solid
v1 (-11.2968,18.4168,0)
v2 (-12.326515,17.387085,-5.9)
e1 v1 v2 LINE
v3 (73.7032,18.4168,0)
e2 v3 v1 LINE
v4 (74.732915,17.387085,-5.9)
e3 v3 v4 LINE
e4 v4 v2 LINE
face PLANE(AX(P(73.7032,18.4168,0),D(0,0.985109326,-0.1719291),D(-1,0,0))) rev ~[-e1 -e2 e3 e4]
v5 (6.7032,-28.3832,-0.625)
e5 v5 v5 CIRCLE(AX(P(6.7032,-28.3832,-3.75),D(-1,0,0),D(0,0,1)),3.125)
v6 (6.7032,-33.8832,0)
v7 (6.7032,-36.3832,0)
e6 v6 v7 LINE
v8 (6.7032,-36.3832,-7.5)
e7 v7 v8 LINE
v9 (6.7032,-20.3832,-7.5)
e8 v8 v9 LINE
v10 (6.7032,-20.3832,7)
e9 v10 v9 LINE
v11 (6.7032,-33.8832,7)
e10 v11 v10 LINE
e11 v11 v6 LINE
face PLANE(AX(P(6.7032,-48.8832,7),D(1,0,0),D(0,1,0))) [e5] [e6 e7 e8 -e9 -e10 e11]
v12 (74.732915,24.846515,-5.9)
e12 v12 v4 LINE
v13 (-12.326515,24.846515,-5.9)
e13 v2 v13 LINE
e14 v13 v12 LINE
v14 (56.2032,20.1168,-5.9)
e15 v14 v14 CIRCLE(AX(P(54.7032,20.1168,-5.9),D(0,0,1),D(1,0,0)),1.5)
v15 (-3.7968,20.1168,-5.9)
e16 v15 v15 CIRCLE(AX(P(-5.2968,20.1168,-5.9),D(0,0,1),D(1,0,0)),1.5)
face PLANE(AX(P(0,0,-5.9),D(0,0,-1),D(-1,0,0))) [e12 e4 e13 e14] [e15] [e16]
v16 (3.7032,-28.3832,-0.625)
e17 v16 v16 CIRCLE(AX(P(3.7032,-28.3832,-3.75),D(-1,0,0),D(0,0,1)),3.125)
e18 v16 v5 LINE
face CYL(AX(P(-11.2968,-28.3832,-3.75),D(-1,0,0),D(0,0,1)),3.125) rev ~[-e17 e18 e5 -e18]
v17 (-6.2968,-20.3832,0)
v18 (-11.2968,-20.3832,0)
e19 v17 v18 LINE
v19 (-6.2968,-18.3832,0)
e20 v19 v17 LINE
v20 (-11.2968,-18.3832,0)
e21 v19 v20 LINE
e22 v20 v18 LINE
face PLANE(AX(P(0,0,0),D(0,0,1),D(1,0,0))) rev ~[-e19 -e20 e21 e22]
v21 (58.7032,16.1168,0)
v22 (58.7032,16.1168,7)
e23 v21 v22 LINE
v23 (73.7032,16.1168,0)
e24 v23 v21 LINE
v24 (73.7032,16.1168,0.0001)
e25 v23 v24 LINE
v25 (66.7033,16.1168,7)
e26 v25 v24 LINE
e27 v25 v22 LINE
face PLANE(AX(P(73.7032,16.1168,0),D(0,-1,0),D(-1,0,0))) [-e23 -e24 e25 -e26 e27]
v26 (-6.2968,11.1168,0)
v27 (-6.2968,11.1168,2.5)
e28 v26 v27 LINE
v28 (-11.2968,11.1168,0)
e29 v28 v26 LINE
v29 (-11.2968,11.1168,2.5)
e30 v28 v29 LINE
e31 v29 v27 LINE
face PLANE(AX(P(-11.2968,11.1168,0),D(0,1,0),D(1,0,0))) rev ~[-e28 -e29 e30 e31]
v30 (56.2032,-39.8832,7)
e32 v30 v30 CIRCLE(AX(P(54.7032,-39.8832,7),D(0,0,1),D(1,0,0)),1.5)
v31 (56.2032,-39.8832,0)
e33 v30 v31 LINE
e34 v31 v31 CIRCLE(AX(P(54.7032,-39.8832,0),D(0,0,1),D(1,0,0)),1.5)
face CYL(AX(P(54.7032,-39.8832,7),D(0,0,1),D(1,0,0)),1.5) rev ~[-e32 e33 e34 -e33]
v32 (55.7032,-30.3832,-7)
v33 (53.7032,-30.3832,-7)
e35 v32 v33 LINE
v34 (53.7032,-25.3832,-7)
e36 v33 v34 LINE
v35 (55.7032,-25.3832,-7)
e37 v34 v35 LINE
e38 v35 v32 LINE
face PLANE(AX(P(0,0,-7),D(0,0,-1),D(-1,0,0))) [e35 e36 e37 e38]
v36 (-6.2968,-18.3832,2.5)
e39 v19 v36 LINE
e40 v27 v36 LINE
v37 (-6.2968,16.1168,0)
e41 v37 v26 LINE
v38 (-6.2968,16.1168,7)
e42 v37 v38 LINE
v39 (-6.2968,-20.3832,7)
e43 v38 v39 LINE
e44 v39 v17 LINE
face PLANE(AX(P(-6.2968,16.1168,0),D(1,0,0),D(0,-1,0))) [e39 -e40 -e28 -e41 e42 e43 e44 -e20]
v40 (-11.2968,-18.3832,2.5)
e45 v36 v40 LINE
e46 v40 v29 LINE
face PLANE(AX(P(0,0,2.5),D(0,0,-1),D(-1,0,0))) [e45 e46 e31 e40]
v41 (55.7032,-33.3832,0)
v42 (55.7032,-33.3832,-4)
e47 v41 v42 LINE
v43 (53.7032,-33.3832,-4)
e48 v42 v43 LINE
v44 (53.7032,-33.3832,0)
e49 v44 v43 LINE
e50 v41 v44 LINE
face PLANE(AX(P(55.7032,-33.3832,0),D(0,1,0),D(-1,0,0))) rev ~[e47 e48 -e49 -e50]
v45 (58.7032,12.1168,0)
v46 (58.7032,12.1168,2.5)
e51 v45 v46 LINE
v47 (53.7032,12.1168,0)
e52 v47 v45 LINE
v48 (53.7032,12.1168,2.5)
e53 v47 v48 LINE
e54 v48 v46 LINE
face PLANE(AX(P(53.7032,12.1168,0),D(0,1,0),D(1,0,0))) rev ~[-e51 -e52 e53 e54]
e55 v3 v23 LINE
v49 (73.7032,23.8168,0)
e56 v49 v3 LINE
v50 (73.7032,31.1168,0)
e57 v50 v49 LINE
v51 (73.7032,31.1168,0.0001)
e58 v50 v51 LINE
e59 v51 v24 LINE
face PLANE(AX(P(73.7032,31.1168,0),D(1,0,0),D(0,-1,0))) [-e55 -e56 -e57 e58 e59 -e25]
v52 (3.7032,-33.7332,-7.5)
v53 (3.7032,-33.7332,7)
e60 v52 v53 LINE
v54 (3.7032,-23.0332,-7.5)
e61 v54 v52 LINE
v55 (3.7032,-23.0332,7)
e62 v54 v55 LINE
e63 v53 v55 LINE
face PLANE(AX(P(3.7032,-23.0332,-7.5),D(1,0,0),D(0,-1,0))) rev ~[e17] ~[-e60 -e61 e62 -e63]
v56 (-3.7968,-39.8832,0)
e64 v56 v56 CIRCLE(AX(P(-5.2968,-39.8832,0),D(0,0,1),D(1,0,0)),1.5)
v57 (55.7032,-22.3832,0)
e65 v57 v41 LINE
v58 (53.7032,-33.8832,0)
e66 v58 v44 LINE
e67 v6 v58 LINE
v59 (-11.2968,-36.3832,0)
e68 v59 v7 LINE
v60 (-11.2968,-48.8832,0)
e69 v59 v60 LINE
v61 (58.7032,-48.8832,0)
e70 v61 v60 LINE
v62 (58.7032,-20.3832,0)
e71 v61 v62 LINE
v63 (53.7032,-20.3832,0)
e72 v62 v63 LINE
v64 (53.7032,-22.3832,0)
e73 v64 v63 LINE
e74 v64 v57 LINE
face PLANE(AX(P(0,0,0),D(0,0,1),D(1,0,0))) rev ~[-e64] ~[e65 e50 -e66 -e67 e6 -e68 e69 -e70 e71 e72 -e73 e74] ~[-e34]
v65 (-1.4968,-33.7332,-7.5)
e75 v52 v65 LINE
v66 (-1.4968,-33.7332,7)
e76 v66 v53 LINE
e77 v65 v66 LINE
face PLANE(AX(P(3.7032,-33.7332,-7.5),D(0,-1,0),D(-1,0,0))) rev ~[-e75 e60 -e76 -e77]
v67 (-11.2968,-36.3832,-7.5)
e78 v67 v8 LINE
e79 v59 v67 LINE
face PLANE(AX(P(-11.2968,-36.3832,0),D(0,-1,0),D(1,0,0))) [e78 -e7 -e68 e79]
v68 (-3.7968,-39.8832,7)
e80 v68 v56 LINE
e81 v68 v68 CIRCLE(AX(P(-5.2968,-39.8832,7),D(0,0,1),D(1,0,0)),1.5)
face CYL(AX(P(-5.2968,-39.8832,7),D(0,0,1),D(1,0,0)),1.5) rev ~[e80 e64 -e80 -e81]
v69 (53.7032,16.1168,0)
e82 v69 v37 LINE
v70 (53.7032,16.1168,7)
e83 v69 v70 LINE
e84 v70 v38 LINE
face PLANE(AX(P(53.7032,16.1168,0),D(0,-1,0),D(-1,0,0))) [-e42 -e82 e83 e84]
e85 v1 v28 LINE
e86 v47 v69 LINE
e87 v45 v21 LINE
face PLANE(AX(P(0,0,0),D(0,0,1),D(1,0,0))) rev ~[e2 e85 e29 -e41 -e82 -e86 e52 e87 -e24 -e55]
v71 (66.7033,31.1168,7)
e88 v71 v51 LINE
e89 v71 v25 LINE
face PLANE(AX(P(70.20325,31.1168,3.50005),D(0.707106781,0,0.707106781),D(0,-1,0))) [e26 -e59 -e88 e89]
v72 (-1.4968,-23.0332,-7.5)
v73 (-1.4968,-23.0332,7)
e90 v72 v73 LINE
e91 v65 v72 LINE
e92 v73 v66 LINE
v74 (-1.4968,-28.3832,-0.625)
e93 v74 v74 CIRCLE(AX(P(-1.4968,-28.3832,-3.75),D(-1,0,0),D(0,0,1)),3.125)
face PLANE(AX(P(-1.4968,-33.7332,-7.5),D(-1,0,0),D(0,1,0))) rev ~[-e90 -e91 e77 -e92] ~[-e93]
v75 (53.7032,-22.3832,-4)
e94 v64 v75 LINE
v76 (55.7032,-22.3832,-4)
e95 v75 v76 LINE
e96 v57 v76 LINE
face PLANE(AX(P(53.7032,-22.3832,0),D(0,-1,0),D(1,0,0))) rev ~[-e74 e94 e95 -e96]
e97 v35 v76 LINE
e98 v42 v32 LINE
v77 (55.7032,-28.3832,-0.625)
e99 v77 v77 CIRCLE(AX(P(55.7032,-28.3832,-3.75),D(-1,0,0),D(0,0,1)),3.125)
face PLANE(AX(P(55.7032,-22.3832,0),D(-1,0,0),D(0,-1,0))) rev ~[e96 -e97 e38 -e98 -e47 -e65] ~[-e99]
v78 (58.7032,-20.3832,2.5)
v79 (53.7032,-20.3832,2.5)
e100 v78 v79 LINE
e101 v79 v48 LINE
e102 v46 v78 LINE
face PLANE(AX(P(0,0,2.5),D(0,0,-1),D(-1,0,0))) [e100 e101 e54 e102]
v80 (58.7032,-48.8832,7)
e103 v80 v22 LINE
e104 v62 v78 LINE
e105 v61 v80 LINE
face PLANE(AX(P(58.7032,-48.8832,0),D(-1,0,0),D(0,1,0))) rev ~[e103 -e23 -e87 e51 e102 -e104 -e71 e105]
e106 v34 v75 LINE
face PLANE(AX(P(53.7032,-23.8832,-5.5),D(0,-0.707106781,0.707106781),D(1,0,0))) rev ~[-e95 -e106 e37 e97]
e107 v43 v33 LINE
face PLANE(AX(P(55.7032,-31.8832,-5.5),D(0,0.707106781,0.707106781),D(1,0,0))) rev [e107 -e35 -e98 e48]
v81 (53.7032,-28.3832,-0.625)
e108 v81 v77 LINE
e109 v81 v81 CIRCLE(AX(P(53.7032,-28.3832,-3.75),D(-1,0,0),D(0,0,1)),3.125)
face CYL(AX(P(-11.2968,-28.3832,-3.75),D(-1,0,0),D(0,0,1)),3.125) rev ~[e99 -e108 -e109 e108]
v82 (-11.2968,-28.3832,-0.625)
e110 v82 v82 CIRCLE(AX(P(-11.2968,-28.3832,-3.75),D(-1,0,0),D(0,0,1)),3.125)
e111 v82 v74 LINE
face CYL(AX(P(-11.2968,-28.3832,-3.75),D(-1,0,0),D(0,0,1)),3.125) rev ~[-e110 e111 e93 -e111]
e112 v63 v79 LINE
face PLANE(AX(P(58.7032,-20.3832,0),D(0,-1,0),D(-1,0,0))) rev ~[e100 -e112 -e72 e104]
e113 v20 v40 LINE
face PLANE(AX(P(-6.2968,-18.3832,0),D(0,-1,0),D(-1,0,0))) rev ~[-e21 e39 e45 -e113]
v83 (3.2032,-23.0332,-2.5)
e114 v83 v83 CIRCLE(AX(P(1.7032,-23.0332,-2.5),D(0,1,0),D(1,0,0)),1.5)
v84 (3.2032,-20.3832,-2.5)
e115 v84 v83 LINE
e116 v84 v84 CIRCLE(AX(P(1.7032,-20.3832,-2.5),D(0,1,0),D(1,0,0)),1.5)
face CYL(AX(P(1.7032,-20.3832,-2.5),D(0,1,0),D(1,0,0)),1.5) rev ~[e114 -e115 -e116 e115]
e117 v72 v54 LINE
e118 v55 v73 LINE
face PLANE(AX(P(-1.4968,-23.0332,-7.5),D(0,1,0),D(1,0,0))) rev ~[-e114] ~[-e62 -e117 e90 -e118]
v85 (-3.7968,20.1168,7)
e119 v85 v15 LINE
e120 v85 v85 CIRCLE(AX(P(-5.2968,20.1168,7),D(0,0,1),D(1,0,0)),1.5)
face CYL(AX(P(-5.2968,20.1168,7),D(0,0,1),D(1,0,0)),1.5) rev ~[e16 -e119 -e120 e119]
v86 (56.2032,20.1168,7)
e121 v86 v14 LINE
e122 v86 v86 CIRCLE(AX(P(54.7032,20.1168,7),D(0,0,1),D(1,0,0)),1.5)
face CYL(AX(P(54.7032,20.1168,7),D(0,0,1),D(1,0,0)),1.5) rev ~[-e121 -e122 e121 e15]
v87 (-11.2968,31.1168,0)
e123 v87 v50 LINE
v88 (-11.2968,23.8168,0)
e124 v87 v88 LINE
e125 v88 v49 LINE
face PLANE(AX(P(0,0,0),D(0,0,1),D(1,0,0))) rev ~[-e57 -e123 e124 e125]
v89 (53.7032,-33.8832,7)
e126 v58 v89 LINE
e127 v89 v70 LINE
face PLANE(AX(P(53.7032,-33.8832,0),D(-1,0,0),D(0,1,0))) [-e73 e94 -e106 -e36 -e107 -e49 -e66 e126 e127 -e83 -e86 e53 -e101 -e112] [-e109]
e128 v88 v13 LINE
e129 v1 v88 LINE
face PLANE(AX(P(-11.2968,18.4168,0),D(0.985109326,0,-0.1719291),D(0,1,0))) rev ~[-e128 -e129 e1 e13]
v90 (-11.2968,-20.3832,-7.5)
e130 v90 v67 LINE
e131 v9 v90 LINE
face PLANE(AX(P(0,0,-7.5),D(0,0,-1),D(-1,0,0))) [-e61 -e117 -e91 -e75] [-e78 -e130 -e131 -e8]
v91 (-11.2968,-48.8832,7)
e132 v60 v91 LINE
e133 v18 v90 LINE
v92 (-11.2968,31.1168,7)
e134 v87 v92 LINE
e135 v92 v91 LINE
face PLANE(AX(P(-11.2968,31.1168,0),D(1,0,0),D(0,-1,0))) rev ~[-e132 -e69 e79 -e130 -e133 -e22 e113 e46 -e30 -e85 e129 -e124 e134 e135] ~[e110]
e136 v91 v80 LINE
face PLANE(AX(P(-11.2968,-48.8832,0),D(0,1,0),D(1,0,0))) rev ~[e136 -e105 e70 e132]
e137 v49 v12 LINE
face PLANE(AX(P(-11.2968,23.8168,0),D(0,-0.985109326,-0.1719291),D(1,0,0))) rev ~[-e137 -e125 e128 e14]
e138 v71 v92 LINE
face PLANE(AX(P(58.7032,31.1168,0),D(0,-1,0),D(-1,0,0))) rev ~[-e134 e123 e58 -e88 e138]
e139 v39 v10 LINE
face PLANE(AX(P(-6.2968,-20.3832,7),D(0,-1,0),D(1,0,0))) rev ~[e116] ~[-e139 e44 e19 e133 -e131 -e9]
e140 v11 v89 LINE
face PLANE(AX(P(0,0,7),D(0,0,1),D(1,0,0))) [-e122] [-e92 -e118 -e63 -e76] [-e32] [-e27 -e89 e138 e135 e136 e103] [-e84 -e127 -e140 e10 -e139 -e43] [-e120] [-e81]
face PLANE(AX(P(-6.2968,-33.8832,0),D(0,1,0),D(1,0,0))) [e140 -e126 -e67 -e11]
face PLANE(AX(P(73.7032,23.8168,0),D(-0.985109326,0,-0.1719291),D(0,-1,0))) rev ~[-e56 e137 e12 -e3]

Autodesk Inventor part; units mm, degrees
ref_plane "YZ Plane" through (0, 0, 0) normal (1, 0, 0) x (0, 1, 0)
ref_plane "XZ Plane" through (0, 0, 0) normal (0, 1, 0) x (-1, 0, 0)
sketch "Sketch1" plane through (0, 0, 0) normal (0, 0, 1) x (1, 0, 0)
  line L0 (58.7032, 31.1168) -> (-11.2968, 31.1168)
  line L1 (-11.2968, 31.1168) -> (-11.2968, -48.8832)
  line L2 (-11.2968, -48.8832) -> (58.7032, -48.8832)
  line L3 (58.7032, -48.8832) -> (58.7032, 31.1168)
  line L4 (53.7032, 16.1168) -> (-6.2968, 16.1168)
  line L5 (-6.2968, 16.1168) -> (-6.2968, -33.8832)
  line L6 (-6.2968, -33.8832) -> (53.7032, -33.8832)
  line L7 (53.7032, -33.8832) -> (53.7032, 16.1168)
  line L8 (58.7032, 31.1168) -> (73.7032, 31.1168)
  line L9 (73.7032, 31.1168) -> (73.7032, 16.1168)
  line L10 (73.7032, 16.1168) -> (58.7032, 16.1168)
  line L11 (58.7032, 16.1168) -> (58.7032, 31.1168)
  point P0 (0, 0)
  dimension "d0" = 70
  dimension "d1" = 80
  dimension "d4" = 60
  dimension "d5" = 50
  dimension "d6" = 15
  dimension "d7" = 5
  dimension "d76" = 15
  dimension "d77" = 15
extrude "Extrusion1" add sketch "Sketch1" along normal blind 7
sketch "Sketch2" plane through (0, 0, 0) normal (0, 0, -1) x (-1, 0, 0)
  line L0 (11.2968, 23.8168) -> (-73.7032, 23.8168)
  line L1 (-73.7032, 23.8168) -> (-73.7032, 18.4168)
  line L2 (-73.7032, 18.4168) -> (11.2968, 18.4168)
  line L3 (11.2968, 18.4168) -> (11.2968, 23.8168)
  line L4 (11.2968, 31.1168) -> (11.2968, -48.8832) projected
  line L5 (-58.7032, -48.8832) -> (-58.7032, 16.1168) projected
  line L6 (-73.7032, 16.1168) -> (-73.7032, 31.1168) projected
  line L7 (-73.7032, 31.1168) -> (11.2968, 31.1168) projected
  point P0 (0, 0)
  dimension "d9" = 5.4
  dimension "d10" = 0
  dimension "d78" = 0
  dimension "d79" = 7.3
extrude "Extrusion2" add sketch "Sketch2" along normal blind 5.9 draft 9.9 contours L3 L2 L1 L0
ref_plane "Work Plane1" through (-126.6696, -48.8832, -9) normal (0, 0, 1) x (1, 0, 0)
sketch "Sketch3" plane through (0, 0, 0) normal (0, 0, -1) x (-1, 0, 0)
  line L0 (11.2968, -36.3832) -> (-6.7032, -36.3832)
  line L1 (-6.7032, -36.3832) -> (-6.7032, -20.3832)
  line L2 (-6.7032, -20.3832) -> (11.2968, -20.3832)
  line L3 (11.2968, -20.3832) -> (11.2968, -36.3832)
  line L4 (11.2968, -48.8832) -> (-58.7032, -48.8832) projected
  line L5 (11.2968, 18.4168) -> (11.2968, -48.8832) projected
  line L6 (-55.7032, -33.3832) -> (-53.7032, -33.3832)
  line L7 (-53.7032, -33.3832) -> (-53.7032, -22.3832)
  line L8 (-53.7032, -22.3832) -> (-55.7032, -22.3832)
  line L9 (-55.7032, -22.3832) -> (-55.7032, -33.3832)
  line L10 (-53.7032, -33.8832) -> (6.2968, -33.8832) projected
  line L11 (-53.7032, 16.1168) -> (-53.7032, -33.8832) projected
  point P0 (0, 0)
  point P1 (-54.7032, -33.3832)
  dimension "d14" = 16
  dimension "d15" = 18
  dimension "d16" = 12.5
  dimension "d17" = 0
  dimension "d62" = 11
  dimension "d63" = 0
  dimension "d64" = 2
  dimension "d102" = 0.5
extrude "Extrusion3" add sketch "Sketch3" along normal blind 7.5
sketch "Sketch6" plane through (0, 0, 7) normal (0, 0, 1) x (1, 0, 0)
  line L0 (-6.2968, -20.3832) -> (6.7032, -20.3832) projected
  line L1 (-11.2968, -48.8832) -> (58.7032, -48.8832) projected
  line L2 (6.7032, -20.3832) -> (-11.2968, -20.3832)
  line L3 (-11.2968, -20.3832) -> (-11.2968, -48.8832)
  line L4 (-11.2968, -48.8832) -> (6.7032, -48.8832)
  line L5 (6.7032, -48.8832) -> (6.7032, -20.3832)
  point P0 (0, 0)
  point P1 (6.7032, -48.8832)
  point P2 (-6.2968, -20.3832)
extrude "Extrusion6" add sketch "Sketch6" against normal up to surface (7 mm away)
sketch "Sketch9" plane through (-11.2968, -48.8832, 7) normal (-1, 0, 0) x (0, 0, 1)
  circle A0 centre (-10.75, 20.5) radius 3.125
  line L0 (0, 80) -> (0, 0) projected
  line L1 (-7, 0) -> (0, 0) projected
  line L2 (-7, 28.5) -> (-7, 65) projected
  point P0 (-7, 48.8832)
  point P1 (-4, 28.5)
  point P2 (-7, 65)
  dimension "d44" = 6.25
  dimension "d46" = 20.5
  dimension "d65" = 3.75
extrude "Extrusion8" cut sketch "Sketch9" against normal through all
sketch "Sketch10" plane through (0, 0, -7.5) normal (0, 0, -1) x (-1, 0, 0)
  line L0 (1.4968, -23.0332) -> (-3.7032, -23.0332)
  line L1 (-3.7032, -23.0332) -> (-3.7032, -33.7332)
  line L2 (-3.7032, -33.7332) -> (1.4968, -33.7332)
  line L3 (1.4968, -33.7332) -> (1.4968, -23.0332)
  line L4 (11.2968, -20.3832) -> (-6.7032, -20.3832) projected
  line L5 (-6.7032, -36.3832) -> (11.2968, -36.3832) projected
  line L6 (-6.7032, -20.3832) -> (-6.7032, -36.3832) projected
  point P0 (0, 0)
  dimension "d49" = 5.2
  dimension "d50" = 10.7
  dimension "d51" = 2.65
  dimension "d52" = 2.65
  dimension "d53" = 3
extrude "Extrusion9" cut sketch "Sketch10" against normal through all
sketch "Sketch11" plane through (-6.2968, -20.3832, 7) normal (0, 1, 0) x (1, 0, 0)
  circle A0 centre (8, 9.5) radius 1.5
  line L0 (10, 14.5) -> (10, 0) projected
  line L1 (-5, 14.5) -> (13, 14.5) projected
  point P0 (6.2968, 7)
  dimension "d56" = 3
  dimension "d57" = 2
  dimension "d58" = 5
extrude "Extrusion10" cut sketch "Sketch11" against normal blind 5
sketch "Sketch12" plane through (0, 0, 0) normal (0, 0, -1) x (-1, 0, 0)
  line L0 (-58.7032, -20.3832) -> (-53.7032, -20.3832)
  line L1 (-53.7032, -20.3832) -> (-53.7032, 12.1168)
  line L2 (-53.7032, 12.1168) -> (-58.7032, 12.1168)
  line L3 (-58.7032, 12.1168) -> (-58.7032, -20.3832)
  line L4 (-53.7032, -22.3832) -> (-55.7032, -22.3832) projected
  line L5 (-53.7032, 16.1168) -> (-53.7032, -22.3832) projected
  line L6 (6.2968, 16.1168) -> (-53.7032, 16.1168) projected
  line L7 (-58.7032, -48.8832) -> (-58.7032, 16.1168) projected
  line L8 (6.2968, -18.3832) -> (11.2968, -18.3832)
  line L9 (11.2968, -18.3832) -> (11.2968, 11.1168)
  line L10 (11.2968, 11.1168) -> (6.2968, 11.1168)
  line L11 (6.2968, 11.1168) -> (6.2968, -18.3832)
  line L12 (11.2968, -20.3832) -> (-6.7032, -20.3832) projected
  line L13 (6.2968, -20.3832) -> (6.2968, 16.1168) projected
  line L14 (11.2968, 18.4168) -> (11.2968, -20.3832) projected
  point P0 (0, 0)
  point P1 (-58.7032, 18.2168)
  point P2 (-53.7032, -33.8832)
  dimension "d66" = 2
  dimension "d67" = 0
  dimension "d68" = 4
  dimension "d69" = 0
  dimension "d70" = 2
  dimension "d71" = 0
  dimension "d72" = 0
  dimension "d73" = 5
extrude "Extrusion11" cut sketch "Sketch12" against normal blind 2.5 contours L3 L2 L1 L0 | L11 L10 L9 L8
sketch "Sketch13" plane through (0, 0, -7.5) normal (0, 0, -1) x (-1, 0, 0)
  line L0 (-55.7032, -22.3832) -> (-55.7032, -33.3832) projected
  line L1 (-53.7032, -22.3832) -> (-55.7032, -22.3832) projected
  line L2 (-55.7032, -33.3832) -> (-53.7032, -33.3832)
  line L3 (-53.7032, -33.3832) -> (-53.7032, -22.3832)
  line L4 (-53.7032, -22.3832) -> (-55.7032, -22.3832)
  line L5 (-55.7032, -22.3832) -> (-55.7032, -33.3832)
  point P0 (0, 0)
extrude "Extrusion12" cut sketch "Sketch13" against normal blind 0.5
chamfer "Chamfer1" distance 3 angle 45 2 edges at (54.7032, -22.3832, -7) (54.7032, -33.3832, -7)
sketch "Sketch14" plane through (0, 0, 7) normal (0, 0, 1) x (1, 0, 0)
  circle A0 centre (-5.2968, 20.1168) radius 1.5
  circle A1 centre (54.7032, 20.1168) radius 1.5
  circle A2 centre (-5.2968, -39.8832) radius 1.5
  circle A3 centre (54.7032, -39.8832) radius 1.5
  line L0 (-11.2968, -48.8832) -> (58.7032, -48.8832) projected
  line L1 (58.7032, -48.8832) -> (58.7032, 16.1168) projected
  point P0 (0, 0)
  dimension "d85" = 3
  dimension "d86" = 3
  dimension "d87" = 3
  dimension "d88" = 3
  dimension "d89" = 9
  dimension "d90" = 9
  dimension "d91" = 60
  dimension "d92" = 60
  dimension "d93" = 4
  dimension "d94" = 4
  dimension "d95" = 60
  dimension "d96" = 60
extrude "Extrusion13" cut sketch "Sketch14" against normal through all
chamfer "Chamfer2" distance 7 angle 45 1 edges at (73.7032, 23.6168, 7)
equation "\"d6\" = -0.5 * d5 + 0.5 * d1"
equation "\"d70\" = d66"
equation "\"d90\" = d89"
equation "\"d92\" = d91"
equation "\"d94\" = d93"
equation "\"d96\" = d95"
properties part number "Rail_carriage_y_top_v2"
